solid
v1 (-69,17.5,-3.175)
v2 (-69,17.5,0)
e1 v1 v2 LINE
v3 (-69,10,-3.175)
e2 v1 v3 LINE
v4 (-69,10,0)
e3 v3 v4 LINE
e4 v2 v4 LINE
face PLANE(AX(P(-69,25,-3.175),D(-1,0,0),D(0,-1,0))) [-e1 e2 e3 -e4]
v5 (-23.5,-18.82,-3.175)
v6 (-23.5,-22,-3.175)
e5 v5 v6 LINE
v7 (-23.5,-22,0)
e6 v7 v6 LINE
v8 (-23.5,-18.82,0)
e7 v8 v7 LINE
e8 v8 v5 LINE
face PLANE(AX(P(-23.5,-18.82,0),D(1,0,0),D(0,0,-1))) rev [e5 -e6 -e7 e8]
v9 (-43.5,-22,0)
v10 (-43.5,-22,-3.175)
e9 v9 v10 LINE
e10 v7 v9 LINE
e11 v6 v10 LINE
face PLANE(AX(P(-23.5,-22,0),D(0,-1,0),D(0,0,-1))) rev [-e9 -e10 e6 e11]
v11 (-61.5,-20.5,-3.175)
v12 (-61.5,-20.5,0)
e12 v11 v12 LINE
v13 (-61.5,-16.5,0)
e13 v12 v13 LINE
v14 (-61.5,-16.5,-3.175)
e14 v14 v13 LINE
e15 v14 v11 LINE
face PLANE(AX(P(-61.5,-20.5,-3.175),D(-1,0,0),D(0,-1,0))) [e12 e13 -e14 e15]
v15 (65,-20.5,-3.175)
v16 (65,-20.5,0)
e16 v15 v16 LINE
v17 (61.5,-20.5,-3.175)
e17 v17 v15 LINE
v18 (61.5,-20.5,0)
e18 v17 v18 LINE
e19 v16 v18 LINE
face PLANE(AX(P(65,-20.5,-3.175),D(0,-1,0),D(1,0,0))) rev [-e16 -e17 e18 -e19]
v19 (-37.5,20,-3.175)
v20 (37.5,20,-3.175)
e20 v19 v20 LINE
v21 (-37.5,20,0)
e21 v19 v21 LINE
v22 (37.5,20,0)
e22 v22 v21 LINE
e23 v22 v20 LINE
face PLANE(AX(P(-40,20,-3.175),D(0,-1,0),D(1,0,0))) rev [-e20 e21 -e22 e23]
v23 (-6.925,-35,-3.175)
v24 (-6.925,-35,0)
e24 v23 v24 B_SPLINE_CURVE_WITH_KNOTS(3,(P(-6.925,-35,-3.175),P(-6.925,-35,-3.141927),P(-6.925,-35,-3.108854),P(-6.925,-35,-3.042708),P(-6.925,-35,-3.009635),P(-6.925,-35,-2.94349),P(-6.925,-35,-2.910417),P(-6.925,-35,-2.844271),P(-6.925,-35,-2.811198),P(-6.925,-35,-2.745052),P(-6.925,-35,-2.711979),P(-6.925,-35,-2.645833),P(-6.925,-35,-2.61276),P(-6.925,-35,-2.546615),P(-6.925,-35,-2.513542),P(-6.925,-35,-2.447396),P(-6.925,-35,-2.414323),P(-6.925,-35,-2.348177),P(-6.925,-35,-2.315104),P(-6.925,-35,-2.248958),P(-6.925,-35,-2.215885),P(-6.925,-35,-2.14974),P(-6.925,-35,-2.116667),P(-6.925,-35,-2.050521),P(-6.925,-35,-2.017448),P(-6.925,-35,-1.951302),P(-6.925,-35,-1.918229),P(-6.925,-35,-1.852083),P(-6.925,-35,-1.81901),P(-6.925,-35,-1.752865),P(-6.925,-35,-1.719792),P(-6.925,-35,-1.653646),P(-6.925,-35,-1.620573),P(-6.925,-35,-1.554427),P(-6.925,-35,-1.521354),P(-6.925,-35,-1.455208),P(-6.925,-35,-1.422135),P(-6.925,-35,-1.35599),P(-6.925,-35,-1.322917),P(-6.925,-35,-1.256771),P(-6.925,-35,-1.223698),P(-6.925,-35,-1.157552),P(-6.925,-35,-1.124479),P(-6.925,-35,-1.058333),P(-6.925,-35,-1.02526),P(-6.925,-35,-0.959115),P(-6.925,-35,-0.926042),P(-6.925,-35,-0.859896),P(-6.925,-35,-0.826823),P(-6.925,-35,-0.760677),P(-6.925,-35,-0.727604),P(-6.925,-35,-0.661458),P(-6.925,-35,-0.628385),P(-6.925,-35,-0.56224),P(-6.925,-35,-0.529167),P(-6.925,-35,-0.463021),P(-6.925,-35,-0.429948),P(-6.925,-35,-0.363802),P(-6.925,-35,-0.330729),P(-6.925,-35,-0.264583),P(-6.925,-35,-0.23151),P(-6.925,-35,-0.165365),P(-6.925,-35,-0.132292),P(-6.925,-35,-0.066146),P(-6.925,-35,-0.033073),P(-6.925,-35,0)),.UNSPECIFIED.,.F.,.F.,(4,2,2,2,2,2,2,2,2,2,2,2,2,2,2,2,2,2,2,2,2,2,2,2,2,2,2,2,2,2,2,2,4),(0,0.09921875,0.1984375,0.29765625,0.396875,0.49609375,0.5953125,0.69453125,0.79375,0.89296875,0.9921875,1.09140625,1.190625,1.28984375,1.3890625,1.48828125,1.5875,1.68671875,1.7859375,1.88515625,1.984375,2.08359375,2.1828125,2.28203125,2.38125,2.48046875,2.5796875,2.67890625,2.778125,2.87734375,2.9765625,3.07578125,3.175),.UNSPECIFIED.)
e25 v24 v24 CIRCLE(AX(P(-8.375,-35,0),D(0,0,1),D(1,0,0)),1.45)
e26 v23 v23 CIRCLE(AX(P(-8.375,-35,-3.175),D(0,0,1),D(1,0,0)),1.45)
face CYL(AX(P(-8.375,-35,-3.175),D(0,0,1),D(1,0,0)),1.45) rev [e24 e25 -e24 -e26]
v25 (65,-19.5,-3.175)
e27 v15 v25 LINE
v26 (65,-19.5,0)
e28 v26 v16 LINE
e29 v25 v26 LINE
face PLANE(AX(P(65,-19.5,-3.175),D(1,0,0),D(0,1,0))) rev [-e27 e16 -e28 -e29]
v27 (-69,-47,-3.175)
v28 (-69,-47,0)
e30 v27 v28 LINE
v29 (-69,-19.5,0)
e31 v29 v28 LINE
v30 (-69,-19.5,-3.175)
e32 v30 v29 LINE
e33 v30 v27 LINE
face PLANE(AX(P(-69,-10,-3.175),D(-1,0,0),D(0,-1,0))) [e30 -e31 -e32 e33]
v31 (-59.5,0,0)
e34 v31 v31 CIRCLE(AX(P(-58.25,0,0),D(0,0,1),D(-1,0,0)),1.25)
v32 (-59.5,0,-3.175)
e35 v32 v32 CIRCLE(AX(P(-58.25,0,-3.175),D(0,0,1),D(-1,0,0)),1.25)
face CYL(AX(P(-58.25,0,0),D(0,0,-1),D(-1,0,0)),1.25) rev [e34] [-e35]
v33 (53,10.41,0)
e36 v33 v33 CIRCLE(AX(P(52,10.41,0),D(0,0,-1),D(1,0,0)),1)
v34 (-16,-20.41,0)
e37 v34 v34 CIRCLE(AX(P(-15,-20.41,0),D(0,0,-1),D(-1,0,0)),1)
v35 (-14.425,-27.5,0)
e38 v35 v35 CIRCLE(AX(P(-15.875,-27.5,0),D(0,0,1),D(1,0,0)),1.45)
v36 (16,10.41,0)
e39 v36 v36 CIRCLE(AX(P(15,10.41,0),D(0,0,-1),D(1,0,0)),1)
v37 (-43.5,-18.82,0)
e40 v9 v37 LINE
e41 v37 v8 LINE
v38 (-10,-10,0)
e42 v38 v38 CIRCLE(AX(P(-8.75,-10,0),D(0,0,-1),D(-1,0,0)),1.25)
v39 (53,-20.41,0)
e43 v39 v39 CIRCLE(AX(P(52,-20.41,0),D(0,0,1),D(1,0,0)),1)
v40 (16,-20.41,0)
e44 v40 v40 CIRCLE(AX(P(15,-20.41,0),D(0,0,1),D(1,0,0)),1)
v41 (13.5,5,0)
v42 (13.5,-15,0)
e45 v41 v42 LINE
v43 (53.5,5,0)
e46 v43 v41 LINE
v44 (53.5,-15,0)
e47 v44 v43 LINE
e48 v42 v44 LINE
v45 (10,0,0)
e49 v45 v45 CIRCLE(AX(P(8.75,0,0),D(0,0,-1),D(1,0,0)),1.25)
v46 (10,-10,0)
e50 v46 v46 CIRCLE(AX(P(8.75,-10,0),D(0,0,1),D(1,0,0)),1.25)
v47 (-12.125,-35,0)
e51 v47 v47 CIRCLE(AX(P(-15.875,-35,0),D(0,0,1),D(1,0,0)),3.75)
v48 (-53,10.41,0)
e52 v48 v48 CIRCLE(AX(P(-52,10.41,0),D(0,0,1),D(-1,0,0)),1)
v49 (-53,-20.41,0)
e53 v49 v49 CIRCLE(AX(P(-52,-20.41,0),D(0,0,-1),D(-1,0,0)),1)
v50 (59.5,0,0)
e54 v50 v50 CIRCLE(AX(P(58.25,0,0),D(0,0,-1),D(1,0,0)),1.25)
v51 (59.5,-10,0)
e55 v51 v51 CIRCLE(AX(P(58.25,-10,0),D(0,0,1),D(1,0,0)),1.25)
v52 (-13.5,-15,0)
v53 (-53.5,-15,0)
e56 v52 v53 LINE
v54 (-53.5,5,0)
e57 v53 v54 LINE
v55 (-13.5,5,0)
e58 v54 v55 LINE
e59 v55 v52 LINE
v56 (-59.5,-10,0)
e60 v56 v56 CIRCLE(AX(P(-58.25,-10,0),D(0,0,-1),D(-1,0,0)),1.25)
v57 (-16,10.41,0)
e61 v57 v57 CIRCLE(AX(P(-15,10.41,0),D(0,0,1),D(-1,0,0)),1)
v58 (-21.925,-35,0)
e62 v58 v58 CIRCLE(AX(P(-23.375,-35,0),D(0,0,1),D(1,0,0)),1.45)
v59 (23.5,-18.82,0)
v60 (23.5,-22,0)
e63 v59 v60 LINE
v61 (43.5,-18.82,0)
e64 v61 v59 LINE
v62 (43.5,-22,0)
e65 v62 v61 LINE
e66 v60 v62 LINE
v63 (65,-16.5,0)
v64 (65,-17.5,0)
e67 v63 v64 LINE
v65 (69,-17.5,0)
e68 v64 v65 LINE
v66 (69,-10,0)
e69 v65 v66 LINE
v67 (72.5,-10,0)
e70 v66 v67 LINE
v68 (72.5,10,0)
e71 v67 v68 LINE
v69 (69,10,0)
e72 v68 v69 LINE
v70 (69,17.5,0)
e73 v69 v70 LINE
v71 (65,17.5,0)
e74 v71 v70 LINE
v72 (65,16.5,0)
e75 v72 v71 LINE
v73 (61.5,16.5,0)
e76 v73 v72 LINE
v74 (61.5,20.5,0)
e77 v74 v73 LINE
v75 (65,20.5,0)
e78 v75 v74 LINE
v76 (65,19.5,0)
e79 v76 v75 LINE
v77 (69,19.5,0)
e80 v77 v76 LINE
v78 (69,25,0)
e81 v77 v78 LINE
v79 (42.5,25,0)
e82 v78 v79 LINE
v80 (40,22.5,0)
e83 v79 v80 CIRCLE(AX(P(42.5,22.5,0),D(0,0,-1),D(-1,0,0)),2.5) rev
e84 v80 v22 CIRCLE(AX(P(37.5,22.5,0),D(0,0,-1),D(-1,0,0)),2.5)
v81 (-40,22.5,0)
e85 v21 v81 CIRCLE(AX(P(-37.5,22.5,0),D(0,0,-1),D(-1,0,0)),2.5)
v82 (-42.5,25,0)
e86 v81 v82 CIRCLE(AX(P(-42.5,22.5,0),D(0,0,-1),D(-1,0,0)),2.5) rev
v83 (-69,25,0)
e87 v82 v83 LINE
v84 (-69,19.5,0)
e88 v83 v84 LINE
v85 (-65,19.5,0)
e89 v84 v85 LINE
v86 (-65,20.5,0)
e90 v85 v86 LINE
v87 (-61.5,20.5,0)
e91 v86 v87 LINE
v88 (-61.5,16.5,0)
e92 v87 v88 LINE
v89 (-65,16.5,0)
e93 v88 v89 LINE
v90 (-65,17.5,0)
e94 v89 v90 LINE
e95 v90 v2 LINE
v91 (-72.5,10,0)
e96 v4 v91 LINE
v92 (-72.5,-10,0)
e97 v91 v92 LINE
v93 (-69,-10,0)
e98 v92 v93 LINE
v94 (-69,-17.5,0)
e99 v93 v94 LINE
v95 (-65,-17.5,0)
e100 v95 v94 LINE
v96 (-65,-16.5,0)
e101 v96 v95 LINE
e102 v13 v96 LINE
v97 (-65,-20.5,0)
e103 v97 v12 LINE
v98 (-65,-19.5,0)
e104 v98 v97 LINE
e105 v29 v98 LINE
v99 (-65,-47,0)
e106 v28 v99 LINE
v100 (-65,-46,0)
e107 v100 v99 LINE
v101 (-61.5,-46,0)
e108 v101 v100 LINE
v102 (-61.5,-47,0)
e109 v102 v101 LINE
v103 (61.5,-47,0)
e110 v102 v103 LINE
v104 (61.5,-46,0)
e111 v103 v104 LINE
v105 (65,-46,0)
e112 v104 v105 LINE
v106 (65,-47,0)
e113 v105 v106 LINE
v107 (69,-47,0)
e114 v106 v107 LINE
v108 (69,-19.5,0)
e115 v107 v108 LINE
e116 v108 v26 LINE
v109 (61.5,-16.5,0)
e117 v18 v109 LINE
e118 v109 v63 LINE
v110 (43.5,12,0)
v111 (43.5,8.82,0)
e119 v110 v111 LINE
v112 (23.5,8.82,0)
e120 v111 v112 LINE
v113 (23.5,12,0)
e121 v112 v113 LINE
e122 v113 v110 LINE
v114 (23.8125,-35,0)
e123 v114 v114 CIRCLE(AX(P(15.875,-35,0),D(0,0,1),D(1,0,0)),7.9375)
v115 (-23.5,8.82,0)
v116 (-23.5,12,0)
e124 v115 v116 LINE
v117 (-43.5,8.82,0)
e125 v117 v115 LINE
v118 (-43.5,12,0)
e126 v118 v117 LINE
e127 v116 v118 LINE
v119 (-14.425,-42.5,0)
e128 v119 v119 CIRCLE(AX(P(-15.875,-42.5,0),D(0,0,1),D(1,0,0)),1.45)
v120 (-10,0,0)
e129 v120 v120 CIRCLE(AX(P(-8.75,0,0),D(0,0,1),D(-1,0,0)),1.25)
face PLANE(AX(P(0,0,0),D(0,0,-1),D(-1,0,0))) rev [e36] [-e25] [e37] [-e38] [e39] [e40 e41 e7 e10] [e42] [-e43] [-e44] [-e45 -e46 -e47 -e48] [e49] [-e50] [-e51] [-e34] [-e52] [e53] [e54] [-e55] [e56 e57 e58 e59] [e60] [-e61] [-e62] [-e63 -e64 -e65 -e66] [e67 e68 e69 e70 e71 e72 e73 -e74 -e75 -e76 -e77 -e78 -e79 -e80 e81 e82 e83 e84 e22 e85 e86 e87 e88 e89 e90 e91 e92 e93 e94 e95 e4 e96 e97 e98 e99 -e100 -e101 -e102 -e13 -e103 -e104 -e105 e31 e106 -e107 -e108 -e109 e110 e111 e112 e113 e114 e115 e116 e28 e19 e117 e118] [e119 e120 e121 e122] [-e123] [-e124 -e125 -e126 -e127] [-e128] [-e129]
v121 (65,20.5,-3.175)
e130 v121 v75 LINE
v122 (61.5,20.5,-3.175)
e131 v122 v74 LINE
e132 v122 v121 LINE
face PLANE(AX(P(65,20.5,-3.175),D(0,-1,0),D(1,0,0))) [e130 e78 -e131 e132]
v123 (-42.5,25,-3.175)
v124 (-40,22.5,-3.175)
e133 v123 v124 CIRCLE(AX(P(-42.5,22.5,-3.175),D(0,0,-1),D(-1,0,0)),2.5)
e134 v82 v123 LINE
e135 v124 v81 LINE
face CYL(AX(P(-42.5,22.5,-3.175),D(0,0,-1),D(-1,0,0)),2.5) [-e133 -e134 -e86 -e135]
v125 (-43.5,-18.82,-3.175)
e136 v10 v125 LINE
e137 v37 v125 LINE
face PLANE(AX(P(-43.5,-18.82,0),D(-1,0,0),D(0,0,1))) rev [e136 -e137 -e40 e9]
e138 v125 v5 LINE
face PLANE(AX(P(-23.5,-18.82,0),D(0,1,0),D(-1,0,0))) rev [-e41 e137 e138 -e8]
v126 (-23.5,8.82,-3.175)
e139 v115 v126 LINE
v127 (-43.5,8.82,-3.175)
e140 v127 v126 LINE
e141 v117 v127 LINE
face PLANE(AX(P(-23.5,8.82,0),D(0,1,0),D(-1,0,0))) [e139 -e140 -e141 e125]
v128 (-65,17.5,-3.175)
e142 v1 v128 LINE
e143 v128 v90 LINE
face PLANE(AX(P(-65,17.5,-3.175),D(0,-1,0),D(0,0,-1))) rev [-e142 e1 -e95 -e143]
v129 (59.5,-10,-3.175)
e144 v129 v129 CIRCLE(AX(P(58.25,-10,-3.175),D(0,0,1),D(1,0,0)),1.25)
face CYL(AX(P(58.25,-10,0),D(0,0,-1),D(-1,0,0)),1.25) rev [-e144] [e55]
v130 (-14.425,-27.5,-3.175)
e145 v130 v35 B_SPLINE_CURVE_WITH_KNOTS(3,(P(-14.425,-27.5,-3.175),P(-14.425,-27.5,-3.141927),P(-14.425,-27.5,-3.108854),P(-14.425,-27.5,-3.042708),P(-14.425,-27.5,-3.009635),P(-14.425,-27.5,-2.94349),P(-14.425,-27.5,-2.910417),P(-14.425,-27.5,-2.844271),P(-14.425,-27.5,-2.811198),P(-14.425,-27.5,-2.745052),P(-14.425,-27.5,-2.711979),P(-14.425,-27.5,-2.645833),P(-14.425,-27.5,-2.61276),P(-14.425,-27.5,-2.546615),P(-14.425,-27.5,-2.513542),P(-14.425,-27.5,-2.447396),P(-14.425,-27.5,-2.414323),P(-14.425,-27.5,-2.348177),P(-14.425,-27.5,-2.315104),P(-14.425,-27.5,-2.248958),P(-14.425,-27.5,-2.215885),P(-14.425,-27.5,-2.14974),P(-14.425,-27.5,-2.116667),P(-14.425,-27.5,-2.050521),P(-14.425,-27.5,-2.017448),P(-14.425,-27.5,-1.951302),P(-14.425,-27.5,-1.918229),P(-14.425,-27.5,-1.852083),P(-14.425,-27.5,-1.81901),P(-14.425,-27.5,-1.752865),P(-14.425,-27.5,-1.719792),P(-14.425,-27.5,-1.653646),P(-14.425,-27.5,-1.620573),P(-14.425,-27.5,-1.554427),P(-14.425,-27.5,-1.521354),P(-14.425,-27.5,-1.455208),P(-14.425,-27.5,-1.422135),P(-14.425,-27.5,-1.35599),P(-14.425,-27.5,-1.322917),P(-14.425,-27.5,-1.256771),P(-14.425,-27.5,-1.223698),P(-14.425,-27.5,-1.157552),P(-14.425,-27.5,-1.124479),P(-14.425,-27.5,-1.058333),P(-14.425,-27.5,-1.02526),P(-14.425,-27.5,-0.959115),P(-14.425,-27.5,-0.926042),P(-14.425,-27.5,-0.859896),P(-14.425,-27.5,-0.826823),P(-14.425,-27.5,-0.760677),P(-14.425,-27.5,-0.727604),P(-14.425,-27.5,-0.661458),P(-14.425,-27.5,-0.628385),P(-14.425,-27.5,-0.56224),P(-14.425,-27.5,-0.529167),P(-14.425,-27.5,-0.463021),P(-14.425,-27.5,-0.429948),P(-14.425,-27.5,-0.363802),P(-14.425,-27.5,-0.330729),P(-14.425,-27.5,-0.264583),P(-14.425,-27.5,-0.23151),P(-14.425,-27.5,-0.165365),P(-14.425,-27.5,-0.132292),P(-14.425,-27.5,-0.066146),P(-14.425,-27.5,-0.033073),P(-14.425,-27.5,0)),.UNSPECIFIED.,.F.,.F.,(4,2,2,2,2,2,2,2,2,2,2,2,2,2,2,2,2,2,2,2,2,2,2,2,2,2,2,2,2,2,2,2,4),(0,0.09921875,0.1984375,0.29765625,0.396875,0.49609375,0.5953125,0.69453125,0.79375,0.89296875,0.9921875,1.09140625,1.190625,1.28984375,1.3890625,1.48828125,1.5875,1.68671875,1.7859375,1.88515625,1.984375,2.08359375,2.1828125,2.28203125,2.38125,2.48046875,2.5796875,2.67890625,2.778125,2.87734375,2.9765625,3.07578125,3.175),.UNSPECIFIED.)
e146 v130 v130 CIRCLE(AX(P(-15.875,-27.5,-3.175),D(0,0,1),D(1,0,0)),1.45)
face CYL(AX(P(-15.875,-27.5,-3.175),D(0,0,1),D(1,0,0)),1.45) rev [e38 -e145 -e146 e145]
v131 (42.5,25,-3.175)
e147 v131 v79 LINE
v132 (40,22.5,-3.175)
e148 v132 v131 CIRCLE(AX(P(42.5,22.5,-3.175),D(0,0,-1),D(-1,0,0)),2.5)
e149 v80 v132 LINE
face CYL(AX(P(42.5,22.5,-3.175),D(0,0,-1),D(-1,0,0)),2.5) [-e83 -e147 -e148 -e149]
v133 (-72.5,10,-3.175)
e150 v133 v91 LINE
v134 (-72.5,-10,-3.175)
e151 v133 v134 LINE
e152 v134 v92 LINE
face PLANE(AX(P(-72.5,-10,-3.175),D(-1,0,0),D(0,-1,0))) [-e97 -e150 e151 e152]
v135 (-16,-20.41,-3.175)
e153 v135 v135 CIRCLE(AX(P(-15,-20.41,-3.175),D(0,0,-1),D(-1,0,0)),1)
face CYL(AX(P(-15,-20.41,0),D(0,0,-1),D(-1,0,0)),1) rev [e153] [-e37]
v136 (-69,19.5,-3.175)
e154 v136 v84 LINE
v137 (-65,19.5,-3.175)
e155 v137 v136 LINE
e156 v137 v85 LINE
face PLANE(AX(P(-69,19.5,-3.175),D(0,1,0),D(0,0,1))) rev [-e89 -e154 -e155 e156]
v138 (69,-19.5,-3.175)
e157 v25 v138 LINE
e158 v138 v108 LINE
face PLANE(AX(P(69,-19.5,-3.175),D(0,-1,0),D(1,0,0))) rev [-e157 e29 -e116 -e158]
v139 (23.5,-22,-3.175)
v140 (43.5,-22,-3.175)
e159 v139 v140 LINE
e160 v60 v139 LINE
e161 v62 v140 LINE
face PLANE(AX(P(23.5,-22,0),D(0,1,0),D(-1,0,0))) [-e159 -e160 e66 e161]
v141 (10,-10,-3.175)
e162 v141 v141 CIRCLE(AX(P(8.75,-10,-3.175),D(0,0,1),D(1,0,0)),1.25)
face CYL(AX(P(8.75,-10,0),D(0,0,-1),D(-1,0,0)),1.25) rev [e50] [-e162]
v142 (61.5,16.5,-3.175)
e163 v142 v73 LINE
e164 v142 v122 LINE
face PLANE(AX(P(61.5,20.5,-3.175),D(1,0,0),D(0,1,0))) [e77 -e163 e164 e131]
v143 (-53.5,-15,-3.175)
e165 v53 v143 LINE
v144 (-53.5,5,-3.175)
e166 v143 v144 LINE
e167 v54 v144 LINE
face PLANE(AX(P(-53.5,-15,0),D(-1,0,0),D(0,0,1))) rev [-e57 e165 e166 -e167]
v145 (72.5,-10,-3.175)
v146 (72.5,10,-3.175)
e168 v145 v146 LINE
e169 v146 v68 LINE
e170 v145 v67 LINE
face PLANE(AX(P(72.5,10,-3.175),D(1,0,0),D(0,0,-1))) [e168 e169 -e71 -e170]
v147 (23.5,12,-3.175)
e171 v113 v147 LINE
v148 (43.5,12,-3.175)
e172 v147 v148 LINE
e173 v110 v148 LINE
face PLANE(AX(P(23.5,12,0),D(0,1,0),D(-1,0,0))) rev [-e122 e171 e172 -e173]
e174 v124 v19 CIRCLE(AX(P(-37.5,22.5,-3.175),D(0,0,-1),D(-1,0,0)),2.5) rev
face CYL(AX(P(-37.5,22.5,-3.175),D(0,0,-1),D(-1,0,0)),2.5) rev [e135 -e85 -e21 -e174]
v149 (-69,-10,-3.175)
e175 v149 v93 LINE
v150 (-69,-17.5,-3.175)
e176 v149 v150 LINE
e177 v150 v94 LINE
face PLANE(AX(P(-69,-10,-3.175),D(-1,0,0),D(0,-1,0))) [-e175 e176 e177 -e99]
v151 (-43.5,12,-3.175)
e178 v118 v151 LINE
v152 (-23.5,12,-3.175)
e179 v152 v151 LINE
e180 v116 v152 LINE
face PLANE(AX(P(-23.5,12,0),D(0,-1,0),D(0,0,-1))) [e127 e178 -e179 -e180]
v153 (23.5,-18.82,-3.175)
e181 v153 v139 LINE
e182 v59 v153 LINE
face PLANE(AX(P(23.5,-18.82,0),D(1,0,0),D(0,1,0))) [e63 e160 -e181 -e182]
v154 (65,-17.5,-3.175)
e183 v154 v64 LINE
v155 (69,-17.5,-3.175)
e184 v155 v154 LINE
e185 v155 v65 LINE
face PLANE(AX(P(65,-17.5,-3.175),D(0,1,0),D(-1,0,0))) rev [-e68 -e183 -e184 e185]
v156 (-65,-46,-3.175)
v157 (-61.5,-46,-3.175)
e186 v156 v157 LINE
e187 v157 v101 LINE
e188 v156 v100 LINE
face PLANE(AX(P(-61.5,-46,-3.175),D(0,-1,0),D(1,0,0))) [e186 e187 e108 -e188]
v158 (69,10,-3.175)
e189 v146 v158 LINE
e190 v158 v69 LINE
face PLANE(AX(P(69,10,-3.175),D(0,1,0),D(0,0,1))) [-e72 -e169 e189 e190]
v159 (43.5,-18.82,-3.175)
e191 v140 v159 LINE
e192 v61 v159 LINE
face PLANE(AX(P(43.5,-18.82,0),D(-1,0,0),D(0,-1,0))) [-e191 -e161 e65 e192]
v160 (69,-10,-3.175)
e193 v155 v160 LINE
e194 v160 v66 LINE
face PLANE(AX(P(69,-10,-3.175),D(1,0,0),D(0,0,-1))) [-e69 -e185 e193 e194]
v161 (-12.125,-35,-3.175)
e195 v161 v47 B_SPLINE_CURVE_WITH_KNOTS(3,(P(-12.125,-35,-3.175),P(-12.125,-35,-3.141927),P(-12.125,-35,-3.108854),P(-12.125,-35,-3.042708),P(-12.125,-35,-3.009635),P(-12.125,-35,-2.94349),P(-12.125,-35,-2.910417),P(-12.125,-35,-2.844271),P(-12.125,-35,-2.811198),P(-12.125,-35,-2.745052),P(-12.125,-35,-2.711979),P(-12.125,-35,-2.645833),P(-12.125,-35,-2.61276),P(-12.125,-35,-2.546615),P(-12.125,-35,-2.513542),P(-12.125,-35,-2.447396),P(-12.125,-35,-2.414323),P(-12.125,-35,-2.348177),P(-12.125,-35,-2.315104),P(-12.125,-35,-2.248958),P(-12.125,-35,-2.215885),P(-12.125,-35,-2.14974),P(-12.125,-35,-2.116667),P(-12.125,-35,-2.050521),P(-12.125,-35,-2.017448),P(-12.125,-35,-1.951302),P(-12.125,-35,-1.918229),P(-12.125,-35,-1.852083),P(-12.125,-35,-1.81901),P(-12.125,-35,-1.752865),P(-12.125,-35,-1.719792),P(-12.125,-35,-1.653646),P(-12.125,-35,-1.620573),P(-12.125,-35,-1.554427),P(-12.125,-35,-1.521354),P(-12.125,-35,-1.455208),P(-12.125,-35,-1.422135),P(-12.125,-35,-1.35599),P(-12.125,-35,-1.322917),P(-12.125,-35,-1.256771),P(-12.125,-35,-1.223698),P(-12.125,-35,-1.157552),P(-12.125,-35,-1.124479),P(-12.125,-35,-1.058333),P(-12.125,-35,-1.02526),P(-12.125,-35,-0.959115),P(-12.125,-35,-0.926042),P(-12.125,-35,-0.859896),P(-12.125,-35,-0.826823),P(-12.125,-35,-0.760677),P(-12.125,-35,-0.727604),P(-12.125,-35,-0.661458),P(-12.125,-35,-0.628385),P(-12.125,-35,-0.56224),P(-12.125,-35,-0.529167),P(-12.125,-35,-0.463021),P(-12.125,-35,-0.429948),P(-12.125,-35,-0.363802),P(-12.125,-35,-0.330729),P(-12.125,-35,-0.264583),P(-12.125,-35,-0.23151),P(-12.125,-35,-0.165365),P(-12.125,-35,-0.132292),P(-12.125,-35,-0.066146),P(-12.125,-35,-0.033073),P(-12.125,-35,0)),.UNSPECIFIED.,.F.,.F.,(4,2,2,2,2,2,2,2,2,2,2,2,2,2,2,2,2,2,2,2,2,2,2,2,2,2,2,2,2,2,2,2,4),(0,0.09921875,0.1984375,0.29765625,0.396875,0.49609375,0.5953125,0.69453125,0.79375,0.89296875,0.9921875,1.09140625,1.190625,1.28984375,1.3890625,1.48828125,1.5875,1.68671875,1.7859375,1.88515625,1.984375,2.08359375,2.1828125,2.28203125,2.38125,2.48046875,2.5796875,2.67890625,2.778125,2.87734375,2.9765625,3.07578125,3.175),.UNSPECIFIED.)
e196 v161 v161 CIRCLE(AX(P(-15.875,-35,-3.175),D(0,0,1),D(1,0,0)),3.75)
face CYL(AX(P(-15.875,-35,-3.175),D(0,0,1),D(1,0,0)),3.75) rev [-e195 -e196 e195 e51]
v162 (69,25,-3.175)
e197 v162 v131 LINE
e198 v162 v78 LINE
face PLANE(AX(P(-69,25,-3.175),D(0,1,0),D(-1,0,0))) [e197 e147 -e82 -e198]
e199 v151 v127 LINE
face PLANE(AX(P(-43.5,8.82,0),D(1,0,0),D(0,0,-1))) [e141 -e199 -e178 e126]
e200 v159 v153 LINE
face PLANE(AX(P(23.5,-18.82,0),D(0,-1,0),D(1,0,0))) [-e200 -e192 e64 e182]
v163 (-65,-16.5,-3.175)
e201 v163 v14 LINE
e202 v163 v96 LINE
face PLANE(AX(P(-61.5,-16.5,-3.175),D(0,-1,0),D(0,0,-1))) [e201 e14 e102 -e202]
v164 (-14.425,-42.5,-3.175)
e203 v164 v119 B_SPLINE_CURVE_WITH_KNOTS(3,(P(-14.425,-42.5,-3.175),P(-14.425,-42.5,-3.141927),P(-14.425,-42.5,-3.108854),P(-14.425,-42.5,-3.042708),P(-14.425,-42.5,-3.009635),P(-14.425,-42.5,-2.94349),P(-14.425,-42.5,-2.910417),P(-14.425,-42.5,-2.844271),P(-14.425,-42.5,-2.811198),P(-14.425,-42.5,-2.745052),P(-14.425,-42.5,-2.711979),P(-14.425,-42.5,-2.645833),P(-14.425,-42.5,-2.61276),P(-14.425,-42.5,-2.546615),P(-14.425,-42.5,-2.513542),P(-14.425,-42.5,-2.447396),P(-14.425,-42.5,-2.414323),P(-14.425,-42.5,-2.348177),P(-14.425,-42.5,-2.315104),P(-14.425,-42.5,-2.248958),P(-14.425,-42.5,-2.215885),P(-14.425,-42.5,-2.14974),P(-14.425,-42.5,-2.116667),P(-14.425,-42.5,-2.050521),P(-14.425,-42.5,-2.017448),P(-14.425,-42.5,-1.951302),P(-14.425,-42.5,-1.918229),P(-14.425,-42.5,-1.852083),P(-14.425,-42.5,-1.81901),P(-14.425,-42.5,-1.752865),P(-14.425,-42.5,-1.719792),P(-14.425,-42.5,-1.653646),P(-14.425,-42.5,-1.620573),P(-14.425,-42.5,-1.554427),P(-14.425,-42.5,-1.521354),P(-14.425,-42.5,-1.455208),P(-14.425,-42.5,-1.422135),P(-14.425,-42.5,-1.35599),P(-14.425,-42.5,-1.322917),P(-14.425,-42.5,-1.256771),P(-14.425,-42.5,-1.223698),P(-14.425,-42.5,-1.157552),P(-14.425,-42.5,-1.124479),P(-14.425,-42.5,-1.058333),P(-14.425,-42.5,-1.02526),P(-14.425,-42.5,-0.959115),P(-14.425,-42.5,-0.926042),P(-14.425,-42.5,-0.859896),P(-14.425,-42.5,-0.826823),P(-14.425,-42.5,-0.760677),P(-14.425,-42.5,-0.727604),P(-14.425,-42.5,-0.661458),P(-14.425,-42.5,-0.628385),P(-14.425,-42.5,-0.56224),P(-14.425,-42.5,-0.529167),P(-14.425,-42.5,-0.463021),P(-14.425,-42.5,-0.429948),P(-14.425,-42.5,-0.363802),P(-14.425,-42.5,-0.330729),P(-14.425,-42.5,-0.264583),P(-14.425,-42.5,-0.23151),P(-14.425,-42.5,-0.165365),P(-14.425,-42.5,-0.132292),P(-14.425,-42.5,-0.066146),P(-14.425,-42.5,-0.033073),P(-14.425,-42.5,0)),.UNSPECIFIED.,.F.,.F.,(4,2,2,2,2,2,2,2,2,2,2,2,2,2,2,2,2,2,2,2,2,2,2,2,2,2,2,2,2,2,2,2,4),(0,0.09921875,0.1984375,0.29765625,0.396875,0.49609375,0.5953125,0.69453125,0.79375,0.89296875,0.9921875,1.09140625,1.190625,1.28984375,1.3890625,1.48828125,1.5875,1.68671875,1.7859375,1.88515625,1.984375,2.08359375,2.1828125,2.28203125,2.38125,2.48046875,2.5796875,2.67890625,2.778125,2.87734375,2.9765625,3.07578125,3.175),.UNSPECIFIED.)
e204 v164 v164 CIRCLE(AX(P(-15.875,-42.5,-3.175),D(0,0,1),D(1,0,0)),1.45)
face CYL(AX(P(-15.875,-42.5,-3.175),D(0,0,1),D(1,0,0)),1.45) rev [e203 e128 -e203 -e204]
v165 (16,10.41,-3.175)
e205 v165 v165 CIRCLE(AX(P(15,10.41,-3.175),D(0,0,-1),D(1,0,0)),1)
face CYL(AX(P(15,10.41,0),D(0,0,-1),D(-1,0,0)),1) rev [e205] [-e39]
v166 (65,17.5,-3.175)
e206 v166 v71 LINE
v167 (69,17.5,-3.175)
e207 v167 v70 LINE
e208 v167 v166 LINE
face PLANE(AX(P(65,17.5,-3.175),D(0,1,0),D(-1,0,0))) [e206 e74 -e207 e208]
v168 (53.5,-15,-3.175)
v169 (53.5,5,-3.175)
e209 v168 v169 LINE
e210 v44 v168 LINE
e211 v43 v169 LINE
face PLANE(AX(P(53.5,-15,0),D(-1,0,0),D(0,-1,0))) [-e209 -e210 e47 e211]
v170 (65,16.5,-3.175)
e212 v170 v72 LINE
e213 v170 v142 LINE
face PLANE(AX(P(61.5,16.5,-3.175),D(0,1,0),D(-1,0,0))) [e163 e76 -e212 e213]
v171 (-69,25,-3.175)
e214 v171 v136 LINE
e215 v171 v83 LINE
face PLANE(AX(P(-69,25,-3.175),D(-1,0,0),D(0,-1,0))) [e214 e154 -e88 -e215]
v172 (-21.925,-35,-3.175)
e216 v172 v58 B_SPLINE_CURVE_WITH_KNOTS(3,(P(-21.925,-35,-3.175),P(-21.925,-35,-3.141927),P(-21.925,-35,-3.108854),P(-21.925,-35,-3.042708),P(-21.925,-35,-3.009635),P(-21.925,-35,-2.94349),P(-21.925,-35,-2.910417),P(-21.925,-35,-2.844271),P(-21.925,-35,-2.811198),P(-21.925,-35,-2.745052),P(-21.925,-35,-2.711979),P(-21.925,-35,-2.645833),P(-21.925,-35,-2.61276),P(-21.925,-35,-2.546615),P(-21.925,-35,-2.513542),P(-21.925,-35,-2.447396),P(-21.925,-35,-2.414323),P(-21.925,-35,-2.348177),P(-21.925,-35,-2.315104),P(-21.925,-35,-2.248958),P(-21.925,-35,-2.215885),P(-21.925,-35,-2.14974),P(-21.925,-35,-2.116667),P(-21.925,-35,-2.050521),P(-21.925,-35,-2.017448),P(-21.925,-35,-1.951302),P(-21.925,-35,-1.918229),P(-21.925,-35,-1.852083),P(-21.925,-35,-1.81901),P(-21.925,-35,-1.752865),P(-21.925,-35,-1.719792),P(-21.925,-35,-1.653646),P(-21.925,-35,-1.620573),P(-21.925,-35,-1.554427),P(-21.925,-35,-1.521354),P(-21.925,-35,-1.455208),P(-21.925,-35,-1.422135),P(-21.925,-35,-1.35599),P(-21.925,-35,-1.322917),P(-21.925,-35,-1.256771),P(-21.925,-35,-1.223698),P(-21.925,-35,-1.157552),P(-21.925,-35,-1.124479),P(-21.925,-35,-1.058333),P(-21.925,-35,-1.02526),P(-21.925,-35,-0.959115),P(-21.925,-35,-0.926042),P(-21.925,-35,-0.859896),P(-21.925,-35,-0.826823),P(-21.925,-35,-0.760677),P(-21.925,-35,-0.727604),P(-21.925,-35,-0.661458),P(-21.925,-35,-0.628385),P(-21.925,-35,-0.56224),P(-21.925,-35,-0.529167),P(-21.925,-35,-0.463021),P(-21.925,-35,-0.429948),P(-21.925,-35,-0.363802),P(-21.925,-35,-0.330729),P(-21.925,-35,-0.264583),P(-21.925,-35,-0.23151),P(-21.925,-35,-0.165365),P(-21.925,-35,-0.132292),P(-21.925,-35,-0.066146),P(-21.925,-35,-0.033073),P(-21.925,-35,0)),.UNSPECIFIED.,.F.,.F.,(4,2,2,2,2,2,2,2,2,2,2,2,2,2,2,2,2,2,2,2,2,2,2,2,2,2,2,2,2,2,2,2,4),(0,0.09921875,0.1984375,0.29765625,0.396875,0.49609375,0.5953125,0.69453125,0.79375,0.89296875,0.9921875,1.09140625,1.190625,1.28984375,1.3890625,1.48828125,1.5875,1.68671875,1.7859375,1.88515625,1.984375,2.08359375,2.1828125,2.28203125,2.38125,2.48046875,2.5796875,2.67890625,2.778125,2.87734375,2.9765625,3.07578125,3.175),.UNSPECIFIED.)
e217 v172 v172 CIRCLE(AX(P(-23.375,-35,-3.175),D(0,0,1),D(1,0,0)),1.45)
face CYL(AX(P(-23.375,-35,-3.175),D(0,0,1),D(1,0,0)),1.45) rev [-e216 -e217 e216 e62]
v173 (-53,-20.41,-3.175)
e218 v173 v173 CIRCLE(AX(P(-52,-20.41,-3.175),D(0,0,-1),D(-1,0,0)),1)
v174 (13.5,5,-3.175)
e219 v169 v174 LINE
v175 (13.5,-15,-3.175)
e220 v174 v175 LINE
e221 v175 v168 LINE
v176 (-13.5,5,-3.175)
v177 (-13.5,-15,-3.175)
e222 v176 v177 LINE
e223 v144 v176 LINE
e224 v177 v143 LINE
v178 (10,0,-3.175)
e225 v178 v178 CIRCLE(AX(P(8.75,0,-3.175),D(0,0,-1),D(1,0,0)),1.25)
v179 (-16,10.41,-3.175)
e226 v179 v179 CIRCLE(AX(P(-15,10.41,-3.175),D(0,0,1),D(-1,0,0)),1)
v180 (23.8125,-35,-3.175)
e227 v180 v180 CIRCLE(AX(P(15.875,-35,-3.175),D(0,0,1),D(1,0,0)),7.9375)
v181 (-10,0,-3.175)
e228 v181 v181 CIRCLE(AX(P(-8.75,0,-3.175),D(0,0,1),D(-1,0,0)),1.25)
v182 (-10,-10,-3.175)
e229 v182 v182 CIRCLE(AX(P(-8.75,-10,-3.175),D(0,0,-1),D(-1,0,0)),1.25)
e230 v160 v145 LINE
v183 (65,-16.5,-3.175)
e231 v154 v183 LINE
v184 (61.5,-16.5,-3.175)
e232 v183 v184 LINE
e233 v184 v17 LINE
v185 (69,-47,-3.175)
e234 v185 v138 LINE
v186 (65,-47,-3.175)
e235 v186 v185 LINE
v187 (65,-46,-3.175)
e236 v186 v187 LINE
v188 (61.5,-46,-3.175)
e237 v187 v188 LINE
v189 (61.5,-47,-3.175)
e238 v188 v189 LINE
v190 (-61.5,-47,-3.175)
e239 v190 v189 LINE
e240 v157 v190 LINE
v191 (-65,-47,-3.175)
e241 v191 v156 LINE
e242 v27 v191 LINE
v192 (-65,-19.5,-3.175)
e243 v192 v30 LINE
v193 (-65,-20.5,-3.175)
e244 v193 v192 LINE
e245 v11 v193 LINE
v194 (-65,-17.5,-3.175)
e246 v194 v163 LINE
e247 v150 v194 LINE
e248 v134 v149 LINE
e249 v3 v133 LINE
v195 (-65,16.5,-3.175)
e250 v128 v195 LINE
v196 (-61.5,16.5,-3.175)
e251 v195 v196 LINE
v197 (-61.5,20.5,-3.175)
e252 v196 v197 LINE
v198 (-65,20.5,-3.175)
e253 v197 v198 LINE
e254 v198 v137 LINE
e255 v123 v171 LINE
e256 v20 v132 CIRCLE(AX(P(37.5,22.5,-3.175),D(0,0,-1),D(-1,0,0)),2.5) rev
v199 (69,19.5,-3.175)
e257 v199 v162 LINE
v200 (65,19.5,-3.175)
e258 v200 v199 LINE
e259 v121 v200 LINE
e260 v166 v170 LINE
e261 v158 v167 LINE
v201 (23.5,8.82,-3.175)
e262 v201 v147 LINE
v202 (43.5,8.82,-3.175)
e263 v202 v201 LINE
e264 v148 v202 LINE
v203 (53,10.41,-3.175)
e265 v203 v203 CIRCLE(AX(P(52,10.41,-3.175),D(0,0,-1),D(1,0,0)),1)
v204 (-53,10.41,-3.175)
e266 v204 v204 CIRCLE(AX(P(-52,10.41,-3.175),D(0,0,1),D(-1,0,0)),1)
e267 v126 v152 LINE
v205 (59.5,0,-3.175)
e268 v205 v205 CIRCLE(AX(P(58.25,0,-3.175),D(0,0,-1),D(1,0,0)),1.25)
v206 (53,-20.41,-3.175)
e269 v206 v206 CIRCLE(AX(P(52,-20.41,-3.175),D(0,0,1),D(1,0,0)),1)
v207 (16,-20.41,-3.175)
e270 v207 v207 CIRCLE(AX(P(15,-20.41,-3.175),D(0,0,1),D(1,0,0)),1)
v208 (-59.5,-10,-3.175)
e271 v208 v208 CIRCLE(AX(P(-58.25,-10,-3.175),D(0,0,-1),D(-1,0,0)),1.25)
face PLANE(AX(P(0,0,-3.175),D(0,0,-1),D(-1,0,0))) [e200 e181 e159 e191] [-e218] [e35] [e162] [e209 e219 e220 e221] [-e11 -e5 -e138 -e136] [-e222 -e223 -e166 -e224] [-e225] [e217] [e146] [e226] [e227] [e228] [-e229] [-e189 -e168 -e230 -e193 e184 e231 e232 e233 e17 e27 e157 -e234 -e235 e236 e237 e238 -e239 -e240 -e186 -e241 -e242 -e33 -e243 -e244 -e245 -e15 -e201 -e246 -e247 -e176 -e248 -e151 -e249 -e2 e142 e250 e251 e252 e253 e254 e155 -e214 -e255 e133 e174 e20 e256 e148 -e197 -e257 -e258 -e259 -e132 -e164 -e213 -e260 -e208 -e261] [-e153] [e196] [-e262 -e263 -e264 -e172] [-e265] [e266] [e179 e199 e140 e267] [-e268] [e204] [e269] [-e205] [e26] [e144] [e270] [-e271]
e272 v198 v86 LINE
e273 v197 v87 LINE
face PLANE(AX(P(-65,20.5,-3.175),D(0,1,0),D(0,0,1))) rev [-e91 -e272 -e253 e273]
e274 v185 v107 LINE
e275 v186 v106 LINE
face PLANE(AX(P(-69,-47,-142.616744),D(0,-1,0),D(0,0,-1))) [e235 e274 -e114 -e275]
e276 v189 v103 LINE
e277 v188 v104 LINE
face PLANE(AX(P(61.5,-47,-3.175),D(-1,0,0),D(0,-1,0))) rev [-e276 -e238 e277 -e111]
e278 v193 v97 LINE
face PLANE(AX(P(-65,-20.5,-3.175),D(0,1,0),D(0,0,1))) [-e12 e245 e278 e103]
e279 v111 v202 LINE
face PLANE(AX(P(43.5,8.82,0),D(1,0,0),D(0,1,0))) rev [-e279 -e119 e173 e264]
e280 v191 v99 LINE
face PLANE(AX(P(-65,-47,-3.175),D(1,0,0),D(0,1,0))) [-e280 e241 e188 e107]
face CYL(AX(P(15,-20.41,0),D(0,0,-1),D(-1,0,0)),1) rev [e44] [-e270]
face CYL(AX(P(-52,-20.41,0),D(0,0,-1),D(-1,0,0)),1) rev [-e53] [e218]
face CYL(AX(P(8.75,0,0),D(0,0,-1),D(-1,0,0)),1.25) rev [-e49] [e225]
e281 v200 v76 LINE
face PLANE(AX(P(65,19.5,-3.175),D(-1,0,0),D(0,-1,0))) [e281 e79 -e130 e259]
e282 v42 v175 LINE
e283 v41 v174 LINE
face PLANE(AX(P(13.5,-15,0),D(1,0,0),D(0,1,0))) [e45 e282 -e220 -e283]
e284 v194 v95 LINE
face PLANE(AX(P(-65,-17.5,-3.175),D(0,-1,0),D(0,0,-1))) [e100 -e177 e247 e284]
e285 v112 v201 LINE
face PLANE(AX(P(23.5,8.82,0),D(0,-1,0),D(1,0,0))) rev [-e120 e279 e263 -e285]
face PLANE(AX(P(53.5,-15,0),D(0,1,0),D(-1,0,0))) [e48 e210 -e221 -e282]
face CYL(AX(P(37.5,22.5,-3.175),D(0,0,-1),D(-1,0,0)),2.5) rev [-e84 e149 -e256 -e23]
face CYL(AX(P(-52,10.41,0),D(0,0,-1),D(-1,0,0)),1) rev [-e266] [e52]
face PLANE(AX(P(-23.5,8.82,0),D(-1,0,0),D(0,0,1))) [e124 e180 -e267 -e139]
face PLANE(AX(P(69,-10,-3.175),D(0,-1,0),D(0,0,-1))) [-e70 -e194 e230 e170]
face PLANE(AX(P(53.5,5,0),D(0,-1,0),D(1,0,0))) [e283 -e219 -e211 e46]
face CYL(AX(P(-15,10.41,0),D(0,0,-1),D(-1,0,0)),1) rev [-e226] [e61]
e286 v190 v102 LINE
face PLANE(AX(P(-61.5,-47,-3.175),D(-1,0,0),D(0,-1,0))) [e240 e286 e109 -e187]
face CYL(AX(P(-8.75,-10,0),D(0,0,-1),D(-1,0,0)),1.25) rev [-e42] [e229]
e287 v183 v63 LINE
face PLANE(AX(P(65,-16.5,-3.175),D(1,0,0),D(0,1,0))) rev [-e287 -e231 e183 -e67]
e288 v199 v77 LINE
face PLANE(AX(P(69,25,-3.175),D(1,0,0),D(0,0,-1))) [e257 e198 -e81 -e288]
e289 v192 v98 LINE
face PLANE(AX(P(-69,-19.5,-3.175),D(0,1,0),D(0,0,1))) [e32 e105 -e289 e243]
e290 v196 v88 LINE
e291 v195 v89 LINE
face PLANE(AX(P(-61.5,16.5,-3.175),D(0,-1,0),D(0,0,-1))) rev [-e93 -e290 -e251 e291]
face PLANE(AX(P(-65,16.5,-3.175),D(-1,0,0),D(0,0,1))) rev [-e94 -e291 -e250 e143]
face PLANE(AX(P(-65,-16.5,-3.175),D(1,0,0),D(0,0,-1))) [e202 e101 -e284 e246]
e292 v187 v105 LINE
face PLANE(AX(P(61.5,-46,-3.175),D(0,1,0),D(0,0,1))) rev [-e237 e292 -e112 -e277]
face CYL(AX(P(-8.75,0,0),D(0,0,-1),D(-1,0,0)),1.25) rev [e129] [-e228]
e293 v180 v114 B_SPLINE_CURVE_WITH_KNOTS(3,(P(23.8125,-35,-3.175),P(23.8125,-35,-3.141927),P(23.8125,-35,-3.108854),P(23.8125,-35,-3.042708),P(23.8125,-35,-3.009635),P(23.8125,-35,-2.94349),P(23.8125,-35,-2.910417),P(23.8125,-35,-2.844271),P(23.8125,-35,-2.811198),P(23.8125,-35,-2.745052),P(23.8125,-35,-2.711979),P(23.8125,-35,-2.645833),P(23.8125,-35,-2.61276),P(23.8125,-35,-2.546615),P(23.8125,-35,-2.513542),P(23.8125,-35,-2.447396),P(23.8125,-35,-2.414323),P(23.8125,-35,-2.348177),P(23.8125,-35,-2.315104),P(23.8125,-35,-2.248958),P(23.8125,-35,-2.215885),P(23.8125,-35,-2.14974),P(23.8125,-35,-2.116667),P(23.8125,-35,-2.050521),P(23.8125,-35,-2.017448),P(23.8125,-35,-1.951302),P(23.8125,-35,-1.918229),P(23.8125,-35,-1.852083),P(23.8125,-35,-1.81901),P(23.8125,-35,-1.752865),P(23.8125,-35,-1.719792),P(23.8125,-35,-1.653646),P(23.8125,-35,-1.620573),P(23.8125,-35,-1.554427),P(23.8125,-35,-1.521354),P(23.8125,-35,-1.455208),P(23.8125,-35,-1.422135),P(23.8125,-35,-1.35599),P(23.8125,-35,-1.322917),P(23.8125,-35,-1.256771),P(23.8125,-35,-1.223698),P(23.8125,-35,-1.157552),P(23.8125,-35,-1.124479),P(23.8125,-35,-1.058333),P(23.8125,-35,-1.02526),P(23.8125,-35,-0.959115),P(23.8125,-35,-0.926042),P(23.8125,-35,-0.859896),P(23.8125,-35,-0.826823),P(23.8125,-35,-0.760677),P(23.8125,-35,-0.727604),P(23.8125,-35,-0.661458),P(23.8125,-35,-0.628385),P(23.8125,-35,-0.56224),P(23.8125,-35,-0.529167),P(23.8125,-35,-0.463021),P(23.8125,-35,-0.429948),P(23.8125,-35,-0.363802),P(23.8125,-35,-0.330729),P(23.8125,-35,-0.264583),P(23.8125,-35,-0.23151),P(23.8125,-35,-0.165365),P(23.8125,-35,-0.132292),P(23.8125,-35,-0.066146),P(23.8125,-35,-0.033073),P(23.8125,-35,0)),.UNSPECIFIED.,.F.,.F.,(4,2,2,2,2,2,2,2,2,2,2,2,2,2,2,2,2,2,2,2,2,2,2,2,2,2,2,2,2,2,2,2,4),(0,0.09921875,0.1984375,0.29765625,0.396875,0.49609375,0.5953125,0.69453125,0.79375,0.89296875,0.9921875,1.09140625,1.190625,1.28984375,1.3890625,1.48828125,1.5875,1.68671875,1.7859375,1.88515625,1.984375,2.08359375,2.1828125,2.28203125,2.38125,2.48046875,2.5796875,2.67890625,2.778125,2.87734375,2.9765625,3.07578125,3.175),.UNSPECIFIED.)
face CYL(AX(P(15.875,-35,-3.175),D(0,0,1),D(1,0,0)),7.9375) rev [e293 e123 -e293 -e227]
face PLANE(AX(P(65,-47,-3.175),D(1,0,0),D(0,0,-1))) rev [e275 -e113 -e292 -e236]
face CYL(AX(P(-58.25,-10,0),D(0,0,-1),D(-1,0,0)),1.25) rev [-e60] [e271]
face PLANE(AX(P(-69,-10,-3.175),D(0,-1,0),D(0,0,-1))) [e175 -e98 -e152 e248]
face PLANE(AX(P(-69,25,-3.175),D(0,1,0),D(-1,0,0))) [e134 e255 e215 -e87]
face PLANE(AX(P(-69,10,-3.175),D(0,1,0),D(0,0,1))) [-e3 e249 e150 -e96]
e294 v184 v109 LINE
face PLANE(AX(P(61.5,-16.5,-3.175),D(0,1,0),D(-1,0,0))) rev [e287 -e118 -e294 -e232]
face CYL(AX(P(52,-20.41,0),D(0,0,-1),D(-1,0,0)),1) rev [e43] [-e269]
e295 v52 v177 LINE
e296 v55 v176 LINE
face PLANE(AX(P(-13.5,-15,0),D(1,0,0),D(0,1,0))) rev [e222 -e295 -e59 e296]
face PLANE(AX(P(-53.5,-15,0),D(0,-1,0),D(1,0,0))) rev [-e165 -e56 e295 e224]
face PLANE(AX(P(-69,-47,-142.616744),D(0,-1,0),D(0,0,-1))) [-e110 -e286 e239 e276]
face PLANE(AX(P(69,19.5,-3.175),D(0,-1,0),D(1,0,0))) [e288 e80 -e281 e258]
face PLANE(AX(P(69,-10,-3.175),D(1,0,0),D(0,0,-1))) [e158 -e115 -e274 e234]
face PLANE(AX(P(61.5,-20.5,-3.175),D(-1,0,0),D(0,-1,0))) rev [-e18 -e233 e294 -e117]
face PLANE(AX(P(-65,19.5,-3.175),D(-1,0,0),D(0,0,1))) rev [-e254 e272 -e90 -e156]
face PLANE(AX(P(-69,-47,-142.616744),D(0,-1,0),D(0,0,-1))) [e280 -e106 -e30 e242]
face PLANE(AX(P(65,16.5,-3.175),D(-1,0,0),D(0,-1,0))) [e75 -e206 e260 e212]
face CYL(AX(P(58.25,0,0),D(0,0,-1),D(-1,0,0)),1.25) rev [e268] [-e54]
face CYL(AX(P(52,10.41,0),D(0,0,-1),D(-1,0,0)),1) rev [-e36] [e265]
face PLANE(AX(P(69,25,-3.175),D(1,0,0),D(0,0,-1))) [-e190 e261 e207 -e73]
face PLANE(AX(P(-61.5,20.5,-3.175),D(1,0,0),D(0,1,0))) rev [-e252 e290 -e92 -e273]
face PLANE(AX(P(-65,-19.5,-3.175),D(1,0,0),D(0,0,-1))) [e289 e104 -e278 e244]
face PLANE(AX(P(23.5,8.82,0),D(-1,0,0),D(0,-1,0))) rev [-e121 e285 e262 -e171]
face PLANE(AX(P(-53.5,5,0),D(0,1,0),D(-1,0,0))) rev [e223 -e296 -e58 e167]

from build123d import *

# Parameters (mm, degrees)
BOSS_EXTRUDE1_DEPTH     = 3.175
CUT_EXTRUDE1_DEPTH      = 78.429520372
MIRROR2_COPY_1_DEPTH    = 78.429520372
SKETCH4_W               = 138
SKETCH4_H               = 20
BOSS_EXTRUDE3_DEPTH     = 3.175
CUT_EXTRUDE2_DEPTH      = 87.459994362
CUT_EXTRUDE2_DEPTH_BACK = 87.459994362
SKETCH5_W               = 80
SKETCH5_H               = 5
FILLET1_R               = 2.5
SKETCH6_W               = 3.5
SKETCH6_H               = 1
CUT_EXTRUDE3_DEPTH      = 87.459994362
SKETCH10_W              = 40
SKETCH10_H              = 20
CUT_EXTRUDE4_DEPTH      = 87.459994362
SKETCH11_R              = 1
SKETCH11_W              = 20
SKETCH11_H              = 3.18
CUT_EXTRUDE5_DEPTH      = 87.459994362
SKETCH12_R              = 1.25
CUT_EXTRUDE6_DEPTH      = 87.459994362
MIRROR5_COPY_1_SKETCH_R = 1
MIRROR5_COPY_1_SKETCH_W = 20
MIRROR5_COPY_1_SKETCH_H = 3.18
MIRROR5_COPY_1_DEPTH    = 87.459994362
MIRROR5_COPY_2_SKETCH_R = 1.25
MIRROR5_COPY_2_DEPTH    = 87.459994362
SKETCH13_R              = 3.75
SKETCH13_R_2            = 7.9375
CUT_EXTRUDE7_DEPTH      = 87.459994362
SKETCH14_R              = 1.45
CUT_EXTRUDE8_DEPTH      = 87.459994362


with BuildPart() as part:
    # Sketch1 → Boss-Extrude1 (new body)
    with BuildSketch(Plane.XY):
        Polygon((-69, -10), (-69, -27), (69, -27), (69, -10), (72.5, -10), (72.5, 10), (69, 10), (69, 25), (-69, 25), (-69, 10), (-72.5, 10), (-72.5, -10), align=None)
    extrude(amount=-BOSS_EXTRUDE1_DEPTH)

    # Sketch2 → Cut-Extrude1 (cut, symmetric)
    with BuildSketch(Plane.XY):
        Polygon((-69, 19.5), (-65, 19.5), (-65, 20.5), (-61.5, 20.5), (-61.5, 16.5), (-65, 16.5), (-65, 17.5), (-69, 17.5), align=None)
    cut_extrude1 = extrude(amount=CUT_EXTRUDE1_DEPTH, both=True, mode=Mode.SUBTRACT)

    # Mirror1: Cut-Extrude1 across plane
    add(cut_extrude1.mirror(Plane.ZY), mode=Mode.SUBTRACT)

    # Mirror2: Cut-Extrude1 across plane
    add(cut_extrude1.mirror(Plane.ZX), mode=Mode.SUBTRACT)

    # Mirror2 copy 1 sketch → Mirror2 copy 1 (cut, symmetric)
    with BuildSketch(Plane(origin=(0, 0, 0), x_dir=(-1, 0, 0), z_dir=(0, 0, 1))):
        Polygon((-69, 19.5), (-65, 19.5), (-65, 20.5), (-61.5, 20.5), (-61.5, 16.5), (-65, 16.5), (-65, 17.5), (-69, 17.5), align=None)
    extrude(amount=MIRROR2_COPY_1_DEPTH, both=True, mode=Mode.SUBTRACT)

    # Sketch4 → Boss-Extrude3 (add)
    with BuildSketch(Plane.XY):
        with Locations((0, -37)):
            Rectangle(SKETCH4_W, SKETCH4_H)
    extrude(amount=-BOSS_EXTRUDE3_DEPTH)

    # Sketch5 → Cut-Extrude2 (cut, two sides: drawn at the far end of the back side and taken through both)
    with BuildSketch(Plane.XY.offset(-CUT_EXTRUDE2_DEPTH_BACK)):
        with Locations((0, 22.5)):
            Rectangle(SKETCH5_W, SKETCH5_H)
    extrude(amount=CUT_EXTRUDE2_DEPTH + CUT_EXTRUDE2_DEPTH_BACK, mode=Mode.SUBTRACT)

    # Fillet1
    fillet1_edges = [part.edges().sort_by_distance(p)[0] for p in [
        (40, 20, -1.5875),
        (-40, 20, -1.5875),
    ]]
    fillet(fillet1_edges, radius=FILLET1_R)
    fillet1_2_edges = [part.edges().sort_by_distance(p)[0] for p in [
        (40, 25, -1.5875),
        (-40, 25, -1.5875),
    ]]
    fillet(fillet1_2_edges, radius=FILLET1_R - 0.0001)  # a hair under: the kernel refuses the full size

    # Sketch6 → Cut-Extrude3 (cut, symmetric)
    with BuildSketch(Plane.XY):
        with Locations((63.25, -46.5)):
            Rectangle(SKETCH6_W, SKETCH6_H)
    cut_extrude3 = extrude(amount=CUT_EXTRUDE3_DEPTH, both=True, mode=Mode.SUBTRACT)

    # Mirror3: Cut-Extrude3 across plane
    add(cut_extrude3.mirror(Plane.ZY), mode=Mode.SUBTRACT)

    # Sketch10 → Cut-Extrude4 (cut, through all)
    with BuildSketch(Plane(origin=(0, 0, -3.175), x_dir=(-1, 0, 0), z_dir=(0, 0, -1))):
        with Locations((33.5, -5)):
            Rectangle(SKETCH10_W, SKETCH10_H)
    cut_extrude4 = extrude(amount=-CUT_EXTRUDE4_DEPTH, mode=Mode.SUBTRACT)

    # Sketch11 → Cut-Extrude5 (cut, through all)
    with BuildSketch(Plane(origin=(0, 0, -3.175), x_dir=(-1, 0, 0), z_dir=(0, 0, -1))):
        with Locations((15, -20.41)):
            Circle(SKETCH11_R)
        with Locations((52, -20.41)):
            Circle(SKETCH11_R)
        with Locations((33.5, -20.41)):
            Rectangle(SKETCH11_W, SKETCH11_H)
    cut_extrude5 = extrude(amount=-CUT_EXTRUDE5_DEPTH, mode=Mode.SUBTRACT)

    # Sketch12 → Cut-Extrude6 (cut, through all)
    with BuildSketch(Plane(origin=(0, 0, -3.175), x_dir=(-1, 0, 0), z_dir=(0, 0, -1))):
        with Locations((8.75, -10)):
            Circle(SKETCH12_R)
        with Locations((58.25, -10)):
            Circle(SKETCH12_R)
    cut_extrude6 = extrude(amount=-CUT_EXTRUDE6_DEPTH, mode=Mode.SUBTRACT)

    # Mirror4: Cut-Extrude5, Cut-Extrude6 across plane
    add(cut_extrude5.mirror(Plane.ZX.offset(-5)), mode=Mode.SUBTRACT)
    add(cut_extrude6.mirror(Plane.ZX.offset(-5)), mode=Mode.SUBTRACT)

    # Mirror5: Cut-Extrude4, Cut-Extrude5, Cut-Extrude6 across plane
    add(cut_extrude4.mirror(Plane.ZY), mode=Mode.SUBTRACT)
    add(cut_extrude5.mirror(Plane.ZY), mode=Mode.SUBTRACT)
    add(cut_extrude6.mirror(Plane.ZY), mode=Mode.SUBTRACT)

    # Mirror5 copy 1 sketch → Mirror5 copy 1 (cut, through all)
    with BuildSketch(Plane(origin=(0, -10, -3.175), x_dir=(1, 0, 0), z_dir=(0, 0, -1))):
        with Locations((15, -20.41)):
            Circle(MIRROR5_COPY_1_SKETCH_R)
        with Locations((52, -20.41)):
            Circle(MIRROR5_COPY_1_SKETCH_R)
        with Locations((33.5, -20.41)):
            Rectangle(MIRROR5_COPY_1_SKETCH_W, MIRROR5_COPY_1_SKETCH_H)
    extrude(amount=-MIRROR5_COPY_1_DEPTH, mode=Mode.SUBTRACT)

    # Mirror5 copy 2 sketch → Mirror5 copy 2 (cut, through all)
    with BuildSketch(Plane(origin=(0, -10, -3.175), x_dir=(1, 0, 0), z_dir=(0, 0, -1))):
        with Locations((8.75, -10)):
            Circle(MIRROR5_COPY_2_SKETCH_R)
        with Locations((58.25, -10)):
            Circle(MIRROR5_COPY_2_SKETCH_R)
    extrude(amount=-MIRROR5_COPY_2_DEPTH, mode=Mode.SUBTRACT)

    # Sketch13 → Cut-Extrude7 (cut, through all)
    with BuildSketch(Plane.XY):
        with Locations((-15.875, -35)):
            Circle(SKETCH13_R)
        with Locations((15.875, -35)):
            Circle(SKETCH13_R_2)
    extrude(amount=-CUT_EXTRUDE7_DEPTH, mode=Mode.SUBTRACT)

    # Sketch14 → Cut-Extrude8 (cut, through all)
    with BuildSketch(Plane.XY):
        with Locations((-23.375, -35)):
            Circle(SKETCH14_R)
        with Locations((-15.875, -27.5)):
            Circle(SKETCH14_R)
        with Locations((-8.375, -35)):
            Circle(SKETCH14_R)
        with Locations((-15.875, -42.5)):
            Circle(SKETCH14_R)
    extrude(amount=-CUT_EXTRUDE8_DEPTH, mode=Mode.SUBTRACT)


solid = part.part
